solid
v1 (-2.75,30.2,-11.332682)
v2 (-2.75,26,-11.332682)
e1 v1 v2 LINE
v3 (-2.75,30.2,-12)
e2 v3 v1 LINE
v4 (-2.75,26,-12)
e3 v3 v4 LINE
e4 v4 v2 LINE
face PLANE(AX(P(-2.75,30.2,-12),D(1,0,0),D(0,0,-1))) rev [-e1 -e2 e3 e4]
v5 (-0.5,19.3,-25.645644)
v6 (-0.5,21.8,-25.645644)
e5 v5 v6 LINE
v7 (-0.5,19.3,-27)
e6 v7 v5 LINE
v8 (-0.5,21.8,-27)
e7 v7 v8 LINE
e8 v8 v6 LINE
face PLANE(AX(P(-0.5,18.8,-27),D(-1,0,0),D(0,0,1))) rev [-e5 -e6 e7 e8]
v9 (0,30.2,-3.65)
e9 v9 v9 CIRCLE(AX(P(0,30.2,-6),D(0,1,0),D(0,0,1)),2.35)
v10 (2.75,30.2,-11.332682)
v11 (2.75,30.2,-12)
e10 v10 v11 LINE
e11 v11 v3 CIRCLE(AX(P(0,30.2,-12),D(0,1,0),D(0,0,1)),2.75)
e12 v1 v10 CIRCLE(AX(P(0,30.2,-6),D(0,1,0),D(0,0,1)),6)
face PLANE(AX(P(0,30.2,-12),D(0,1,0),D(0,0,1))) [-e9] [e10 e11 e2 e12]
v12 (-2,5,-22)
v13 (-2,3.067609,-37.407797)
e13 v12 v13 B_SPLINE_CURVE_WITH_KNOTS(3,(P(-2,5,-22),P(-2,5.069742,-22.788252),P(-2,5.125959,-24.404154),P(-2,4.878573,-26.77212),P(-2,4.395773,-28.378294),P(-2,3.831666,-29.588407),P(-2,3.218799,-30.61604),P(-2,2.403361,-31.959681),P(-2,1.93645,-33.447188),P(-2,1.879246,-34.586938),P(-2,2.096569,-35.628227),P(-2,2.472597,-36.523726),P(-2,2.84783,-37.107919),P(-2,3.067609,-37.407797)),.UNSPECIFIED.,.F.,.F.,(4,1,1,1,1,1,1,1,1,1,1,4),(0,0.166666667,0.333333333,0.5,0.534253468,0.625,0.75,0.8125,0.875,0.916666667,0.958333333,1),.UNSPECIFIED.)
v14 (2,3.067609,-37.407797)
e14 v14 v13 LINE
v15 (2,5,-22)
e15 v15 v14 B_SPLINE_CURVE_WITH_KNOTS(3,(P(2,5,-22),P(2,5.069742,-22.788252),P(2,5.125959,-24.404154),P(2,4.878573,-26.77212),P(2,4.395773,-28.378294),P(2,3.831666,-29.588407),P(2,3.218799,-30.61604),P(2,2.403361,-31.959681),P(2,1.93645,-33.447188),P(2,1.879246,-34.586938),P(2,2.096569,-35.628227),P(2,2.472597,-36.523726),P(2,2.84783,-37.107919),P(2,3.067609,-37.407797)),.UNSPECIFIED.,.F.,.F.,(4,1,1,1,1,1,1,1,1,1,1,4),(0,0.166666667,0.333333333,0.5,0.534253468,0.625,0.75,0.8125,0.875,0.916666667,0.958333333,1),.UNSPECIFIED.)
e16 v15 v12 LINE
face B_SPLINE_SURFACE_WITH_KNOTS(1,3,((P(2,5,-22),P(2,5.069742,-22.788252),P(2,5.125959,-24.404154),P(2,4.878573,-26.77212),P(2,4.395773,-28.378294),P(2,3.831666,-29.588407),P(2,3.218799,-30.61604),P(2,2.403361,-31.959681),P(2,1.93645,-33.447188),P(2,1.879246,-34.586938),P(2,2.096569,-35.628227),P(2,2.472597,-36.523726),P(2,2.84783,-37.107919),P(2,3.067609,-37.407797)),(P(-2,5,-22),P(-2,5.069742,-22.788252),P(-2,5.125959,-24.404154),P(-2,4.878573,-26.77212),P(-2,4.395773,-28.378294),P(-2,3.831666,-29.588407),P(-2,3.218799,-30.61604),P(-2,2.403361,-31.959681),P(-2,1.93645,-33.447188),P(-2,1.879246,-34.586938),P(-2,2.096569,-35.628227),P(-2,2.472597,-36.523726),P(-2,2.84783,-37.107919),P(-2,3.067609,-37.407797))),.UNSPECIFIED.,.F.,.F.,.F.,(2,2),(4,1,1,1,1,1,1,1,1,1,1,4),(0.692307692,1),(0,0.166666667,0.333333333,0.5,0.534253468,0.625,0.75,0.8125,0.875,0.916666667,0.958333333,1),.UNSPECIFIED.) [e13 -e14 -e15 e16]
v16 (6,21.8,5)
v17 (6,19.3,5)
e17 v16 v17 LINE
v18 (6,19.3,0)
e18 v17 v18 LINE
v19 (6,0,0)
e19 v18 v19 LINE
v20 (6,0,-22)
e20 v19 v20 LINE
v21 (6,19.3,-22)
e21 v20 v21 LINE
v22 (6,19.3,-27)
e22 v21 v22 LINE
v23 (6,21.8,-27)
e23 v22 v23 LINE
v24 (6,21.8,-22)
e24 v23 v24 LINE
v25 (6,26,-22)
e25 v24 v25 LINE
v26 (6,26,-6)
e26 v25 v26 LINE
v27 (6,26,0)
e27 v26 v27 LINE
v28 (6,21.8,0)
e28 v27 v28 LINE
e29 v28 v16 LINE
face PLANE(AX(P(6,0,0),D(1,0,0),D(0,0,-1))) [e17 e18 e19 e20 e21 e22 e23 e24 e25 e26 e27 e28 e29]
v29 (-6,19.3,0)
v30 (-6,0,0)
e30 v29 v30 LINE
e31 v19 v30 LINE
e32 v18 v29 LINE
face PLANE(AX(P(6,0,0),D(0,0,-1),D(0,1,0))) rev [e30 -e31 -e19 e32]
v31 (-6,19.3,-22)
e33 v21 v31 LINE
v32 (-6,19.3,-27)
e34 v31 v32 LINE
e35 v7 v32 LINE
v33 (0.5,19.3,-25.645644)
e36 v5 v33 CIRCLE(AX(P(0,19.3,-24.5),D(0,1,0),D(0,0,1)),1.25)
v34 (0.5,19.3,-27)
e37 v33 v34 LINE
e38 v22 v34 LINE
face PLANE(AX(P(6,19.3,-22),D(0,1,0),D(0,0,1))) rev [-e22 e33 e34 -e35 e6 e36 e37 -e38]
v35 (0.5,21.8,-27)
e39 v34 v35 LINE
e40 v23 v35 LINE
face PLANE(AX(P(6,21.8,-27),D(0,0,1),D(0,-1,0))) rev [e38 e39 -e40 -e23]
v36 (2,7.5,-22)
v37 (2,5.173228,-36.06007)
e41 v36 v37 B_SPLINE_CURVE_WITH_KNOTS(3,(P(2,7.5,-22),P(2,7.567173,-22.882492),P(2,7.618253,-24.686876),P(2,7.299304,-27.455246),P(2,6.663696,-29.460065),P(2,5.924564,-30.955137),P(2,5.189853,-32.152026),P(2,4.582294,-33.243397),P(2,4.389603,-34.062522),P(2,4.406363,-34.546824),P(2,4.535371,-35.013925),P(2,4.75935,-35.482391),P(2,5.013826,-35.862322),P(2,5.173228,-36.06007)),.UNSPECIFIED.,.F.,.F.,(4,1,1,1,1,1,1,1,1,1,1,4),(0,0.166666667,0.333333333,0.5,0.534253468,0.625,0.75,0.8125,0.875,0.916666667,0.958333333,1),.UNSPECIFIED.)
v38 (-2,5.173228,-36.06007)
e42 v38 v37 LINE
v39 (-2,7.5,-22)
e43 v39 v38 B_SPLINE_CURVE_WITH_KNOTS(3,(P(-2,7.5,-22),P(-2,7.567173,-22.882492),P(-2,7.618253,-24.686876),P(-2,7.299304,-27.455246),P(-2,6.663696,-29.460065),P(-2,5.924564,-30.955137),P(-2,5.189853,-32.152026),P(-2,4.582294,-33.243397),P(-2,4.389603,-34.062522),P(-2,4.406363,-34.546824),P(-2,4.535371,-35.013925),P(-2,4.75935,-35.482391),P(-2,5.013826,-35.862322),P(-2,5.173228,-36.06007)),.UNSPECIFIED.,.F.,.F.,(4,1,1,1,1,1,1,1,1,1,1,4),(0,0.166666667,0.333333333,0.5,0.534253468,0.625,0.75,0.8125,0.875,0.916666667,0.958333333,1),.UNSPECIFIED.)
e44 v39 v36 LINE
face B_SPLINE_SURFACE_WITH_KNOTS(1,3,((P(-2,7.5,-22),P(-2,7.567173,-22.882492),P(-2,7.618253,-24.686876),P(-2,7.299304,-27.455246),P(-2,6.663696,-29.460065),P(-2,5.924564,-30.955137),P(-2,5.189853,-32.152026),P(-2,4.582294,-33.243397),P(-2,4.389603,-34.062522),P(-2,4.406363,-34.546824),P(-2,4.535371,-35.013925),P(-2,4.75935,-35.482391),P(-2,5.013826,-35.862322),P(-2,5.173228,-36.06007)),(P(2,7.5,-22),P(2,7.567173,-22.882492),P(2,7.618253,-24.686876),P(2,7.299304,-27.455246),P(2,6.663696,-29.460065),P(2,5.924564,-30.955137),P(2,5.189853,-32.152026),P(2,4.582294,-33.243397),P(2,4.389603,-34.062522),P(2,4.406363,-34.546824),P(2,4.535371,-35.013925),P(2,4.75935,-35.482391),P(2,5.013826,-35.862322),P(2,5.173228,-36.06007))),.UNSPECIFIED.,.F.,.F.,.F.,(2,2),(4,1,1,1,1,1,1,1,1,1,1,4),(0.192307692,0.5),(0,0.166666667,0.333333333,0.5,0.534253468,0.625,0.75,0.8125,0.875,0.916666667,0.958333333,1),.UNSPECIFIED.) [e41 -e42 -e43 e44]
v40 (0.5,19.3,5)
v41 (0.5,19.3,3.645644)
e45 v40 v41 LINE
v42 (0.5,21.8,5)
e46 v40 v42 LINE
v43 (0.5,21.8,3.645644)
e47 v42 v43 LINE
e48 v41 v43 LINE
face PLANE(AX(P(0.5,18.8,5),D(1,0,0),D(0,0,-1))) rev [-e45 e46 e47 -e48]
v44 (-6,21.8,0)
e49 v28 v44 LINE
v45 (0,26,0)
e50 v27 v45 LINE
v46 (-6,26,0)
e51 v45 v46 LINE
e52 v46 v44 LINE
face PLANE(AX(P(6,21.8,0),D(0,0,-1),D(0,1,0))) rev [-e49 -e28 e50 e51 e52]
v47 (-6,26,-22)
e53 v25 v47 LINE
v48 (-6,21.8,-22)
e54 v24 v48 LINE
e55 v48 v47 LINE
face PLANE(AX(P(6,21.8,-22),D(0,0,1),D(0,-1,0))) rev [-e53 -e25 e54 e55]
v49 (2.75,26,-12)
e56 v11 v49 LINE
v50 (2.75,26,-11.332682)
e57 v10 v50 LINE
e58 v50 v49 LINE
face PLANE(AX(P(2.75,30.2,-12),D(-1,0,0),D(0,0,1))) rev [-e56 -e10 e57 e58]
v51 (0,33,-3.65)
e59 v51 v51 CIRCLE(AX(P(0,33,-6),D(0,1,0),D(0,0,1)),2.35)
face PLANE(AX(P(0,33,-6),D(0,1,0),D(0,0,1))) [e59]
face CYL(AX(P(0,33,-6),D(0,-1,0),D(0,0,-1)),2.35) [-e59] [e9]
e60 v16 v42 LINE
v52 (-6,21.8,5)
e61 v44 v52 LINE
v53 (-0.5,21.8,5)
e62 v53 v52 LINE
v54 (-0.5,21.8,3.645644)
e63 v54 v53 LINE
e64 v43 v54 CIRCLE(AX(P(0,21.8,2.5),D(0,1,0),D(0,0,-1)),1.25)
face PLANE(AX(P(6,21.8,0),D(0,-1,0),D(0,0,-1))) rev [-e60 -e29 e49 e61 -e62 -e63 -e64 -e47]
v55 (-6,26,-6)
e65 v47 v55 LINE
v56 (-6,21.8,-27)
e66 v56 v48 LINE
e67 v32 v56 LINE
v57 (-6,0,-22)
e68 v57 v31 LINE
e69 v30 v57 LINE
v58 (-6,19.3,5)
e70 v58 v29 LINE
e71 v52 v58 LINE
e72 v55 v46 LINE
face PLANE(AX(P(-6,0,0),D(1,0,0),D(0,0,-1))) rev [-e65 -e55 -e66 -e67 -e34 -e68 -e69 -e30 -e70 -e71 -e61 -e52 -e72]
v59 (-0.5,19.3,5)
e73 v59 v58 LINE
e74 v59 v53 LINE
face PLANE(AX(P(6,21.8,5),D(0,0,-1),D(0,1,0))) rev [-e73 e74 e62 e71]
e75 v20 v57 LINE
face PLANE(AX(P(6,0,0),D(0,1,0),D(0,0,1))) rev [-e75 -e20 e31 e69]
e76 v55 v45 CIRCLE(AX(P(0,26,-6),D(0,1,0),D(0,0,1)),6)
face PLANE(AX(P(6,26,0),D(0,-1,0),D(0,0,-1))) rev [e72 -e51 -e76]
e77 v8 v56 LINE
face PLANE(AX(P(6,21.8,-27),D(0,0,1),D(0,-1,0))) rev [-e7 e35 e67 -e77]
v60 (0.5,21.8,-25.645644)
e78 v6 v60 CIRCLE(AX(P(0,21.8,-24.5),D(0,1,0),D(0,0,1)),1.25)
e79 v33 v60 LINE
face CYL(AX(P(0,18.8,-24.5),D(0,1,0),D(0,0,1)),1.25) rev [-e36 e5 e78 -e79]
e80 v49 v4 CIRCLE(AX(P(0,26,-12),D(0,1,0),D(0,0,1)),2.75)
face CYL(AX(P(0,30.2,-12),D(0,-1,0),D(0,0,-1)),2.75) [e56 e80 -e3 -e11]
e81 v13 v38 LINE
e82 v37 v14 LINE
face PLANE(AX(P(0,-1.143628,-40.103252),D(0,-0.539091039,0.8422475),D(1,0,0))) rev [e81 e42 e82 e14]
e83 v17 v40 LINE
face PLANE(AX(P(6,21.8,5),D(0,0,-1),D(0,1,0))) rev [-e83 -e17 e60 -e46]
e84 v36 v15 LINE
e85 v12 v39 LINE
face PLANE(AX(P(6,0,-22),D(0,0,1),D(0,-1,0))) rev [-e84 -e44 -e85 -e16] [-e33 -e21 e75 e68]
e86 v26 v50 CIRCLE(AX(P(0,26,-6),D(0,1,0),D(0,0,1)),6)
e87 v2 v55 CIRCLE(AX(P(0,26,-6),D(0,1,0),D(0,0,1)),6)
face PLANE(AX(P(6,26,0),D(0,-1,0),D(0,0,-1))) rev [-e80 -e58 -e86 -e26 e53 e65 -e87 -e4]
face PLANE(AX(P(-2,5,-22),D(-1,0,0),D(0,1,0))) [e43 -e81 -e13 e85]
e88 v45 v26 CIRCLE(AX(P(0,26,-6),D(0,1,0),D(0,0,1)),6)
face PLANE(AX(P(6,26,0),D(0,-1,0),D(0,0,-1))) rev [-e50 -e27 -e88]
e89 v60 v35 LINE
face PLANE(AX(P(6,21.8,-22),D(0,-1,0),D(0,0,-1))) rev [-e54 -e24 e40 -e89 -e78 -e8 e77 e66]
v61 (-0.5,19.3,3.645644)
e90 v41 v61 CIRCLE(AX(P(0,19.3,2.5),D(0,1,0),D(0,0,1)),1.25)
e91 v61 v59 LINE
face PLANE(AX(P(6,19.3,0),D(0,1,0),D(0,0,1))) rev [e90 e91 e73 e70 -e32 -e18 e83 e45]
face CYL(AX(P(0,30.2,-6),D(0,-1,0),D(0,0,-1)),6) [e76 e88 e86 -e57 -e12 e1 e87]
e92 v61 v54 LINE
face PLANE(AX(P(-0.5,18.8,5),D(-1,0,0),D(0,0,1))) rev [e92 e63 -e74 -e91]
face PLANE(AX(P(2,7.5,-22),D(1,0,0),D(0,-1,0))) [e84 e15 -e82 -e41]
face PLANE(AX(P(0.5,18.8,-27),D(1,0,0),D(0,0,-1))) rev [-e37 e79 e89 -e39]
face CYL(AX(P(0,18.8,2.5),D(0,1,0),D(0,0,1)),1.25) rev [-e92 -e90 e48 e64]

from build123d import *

# Parameters (mm, degrees)
EXTRUDE_1_DEPTH     = 6
EXTRUDE_2_DEPTH     = 4.2
SKETCH_3_R          = 2.35
EXTRUDE_3_DEPTH     = 2.8
SWEEP_START         = -2
SWEEP_1_DEPTH       = 4
CUT_EXTRUDE_1_DEPTH = 3


# Read off the part's stored shape, not the designer's step: По траектории1
with BuildPart() as part:
    # Эскиз1 → Бобышка-Вытянуть1 (new, symmetric)
    with BuildSketch(Plane(origin=(0, 0, 0), x_dir=(0, 0, -1), z_dir=(1, 0, 0))):
        Polygon((0, 0), (22, 0), (22, 19.3), (27, 19.3), (27, 21.8), (22, 21.8), (22, 26), (0, 26), (0, 21.8), (-5, 21.8), (-5, 19.3), (0, 19.3), align=None)
    extrude(amount=EXTRUDE_1_DEPTH, both=True)

    # Эскиз2 → Бобышка-Вытянуть2 (add)
    with BuildSketch(Plane(origin=(0, 26, 0), x_dir=(1, 0, 0), z_dir=(0, 1, 0))):
        with BuildLine():
            Line((-2.75, 12), (-2.75, 11.332682252))
            ThreePointArc((-2.75, 11.332682252), (0, 0), (2.75, 11.332682252))
            Line((2.75, 11.332682252), (2.75, 12))
            ThreePointArc((2.75, 12), (0, 14.75), (-2.75, 12))
        make_face()
    extrude(amount=EXTRUDE_2_DEPTH)

    # Эскиз3 → Бобышка-Вытянуть3 (add)
    with BuildSketch(Plane(origin=(0, 30.2, 0), x_dir=(1, 0, 0), z_dir=(0, 1, 0))):
        with Locations(Location((0, 6, 0), (0, 0, 270))):
            Circle(SKETCH_3_R)
    extrude(amount=EXTRUDE_3_DEPTH)

    # По траектории1 outline → По траектории1 (add)
    with BuildSketch(Plane.YZ.offset(SWEEP_START)):
        with BuildLine():
            Line((7.5, -22), (5, -22))
            add(Edge.make_bspline(
                [(5, -22), (5.069741994, -22.788251561), (5.125958635, -24.404153677), (4.878573381, -26.772120173), (4.395772619, -28.378294328), (3.83166606, -29.588406839), (3.21879889, -30.61604033), (2.403361035, -31.959681467), (1.936450048, -33.447187834), (1.879246473, -34.586937516), (2.09656871, -35.628227488), (2.472597261, -36.523725644), (2.84782964, -37.107918611), (3.067609014, -37.407797225)],
                knots=[0, 0, 0, 0, 0.166666667, 0.333333333, 0.5, 0.534253468, 0.625, 0.75, 0.8125, 0.875, 0.916666667, 0.958333333, 1, 1, 1, 1], degree=3))
            Line((3.067609014, -37.407797225), (5.173227765, -36.060069628))
            add(Edge.make_bspline(
                [(7.5, -22), (7.567173372, -22.882492449), (7.618252767, -24.686876341), (7.299304344, -27.455245749), (6.663696491, -29.460064755), (5.924563706, -30.955136787), (5.18985295, -32.152025941), (4.582294135, -33.24339685), (4.389602767, -34.062522123), (4.406362916, -34.546823904), (4.535371286, -35.013924669), (4.759350216, -35.482390845), (5.013826459, -35.862321947), (5.173227765, -36.060069628)],
                knots=[0, 0, 0, 0, 0.166666667, 0.333333333, 0.5, 0.534253468, 0.625, 0.75, 0.8125, 0.875, 0.916666667, 0.958333333, 1, 1, 1, 1], degree=3))
        make_face()
    extrude(amount=SWEEP_1_DEPTH)

    # Эскиз6 → Вырез-Вытянуть1 (cut)
    with BuildSketch(Plane(origin=(0, 21.8, 0), x_dir=(1, 0, 0), z_dir=(0, 1, 0))):
        with BuildLine():
            Line((-0.5, 27), (-0.5, 25.645643924))
            ThreePointArc((-0.5, 25.645643924), (0, 23.25), (0.5, 25.645643924))
            Line((0.5, 25.645643924), (0.5, 27))
            Line((0.5, 27), (0, 27))
            Line((0, 27), (-0.5, 27))
        make_face()
        with BuildLine():
            Line((0.5, -5), (0.5, -3.645643924))
            ThreePointArc((0.5, -3.645643924), (0, -1.25), (-0.5, -3.645643924))
            Line((-0.5, -3.645643924), (-0.5, -5))
            Line((-0.5, -5), (0, -5))
            Line((0, -5), (0.5, -5))
        make_face()
    extrude(amount=-CUT_EXTRUDE_1_DEPTH, mode=Mode.SUBTRACT)


solid = part.part
